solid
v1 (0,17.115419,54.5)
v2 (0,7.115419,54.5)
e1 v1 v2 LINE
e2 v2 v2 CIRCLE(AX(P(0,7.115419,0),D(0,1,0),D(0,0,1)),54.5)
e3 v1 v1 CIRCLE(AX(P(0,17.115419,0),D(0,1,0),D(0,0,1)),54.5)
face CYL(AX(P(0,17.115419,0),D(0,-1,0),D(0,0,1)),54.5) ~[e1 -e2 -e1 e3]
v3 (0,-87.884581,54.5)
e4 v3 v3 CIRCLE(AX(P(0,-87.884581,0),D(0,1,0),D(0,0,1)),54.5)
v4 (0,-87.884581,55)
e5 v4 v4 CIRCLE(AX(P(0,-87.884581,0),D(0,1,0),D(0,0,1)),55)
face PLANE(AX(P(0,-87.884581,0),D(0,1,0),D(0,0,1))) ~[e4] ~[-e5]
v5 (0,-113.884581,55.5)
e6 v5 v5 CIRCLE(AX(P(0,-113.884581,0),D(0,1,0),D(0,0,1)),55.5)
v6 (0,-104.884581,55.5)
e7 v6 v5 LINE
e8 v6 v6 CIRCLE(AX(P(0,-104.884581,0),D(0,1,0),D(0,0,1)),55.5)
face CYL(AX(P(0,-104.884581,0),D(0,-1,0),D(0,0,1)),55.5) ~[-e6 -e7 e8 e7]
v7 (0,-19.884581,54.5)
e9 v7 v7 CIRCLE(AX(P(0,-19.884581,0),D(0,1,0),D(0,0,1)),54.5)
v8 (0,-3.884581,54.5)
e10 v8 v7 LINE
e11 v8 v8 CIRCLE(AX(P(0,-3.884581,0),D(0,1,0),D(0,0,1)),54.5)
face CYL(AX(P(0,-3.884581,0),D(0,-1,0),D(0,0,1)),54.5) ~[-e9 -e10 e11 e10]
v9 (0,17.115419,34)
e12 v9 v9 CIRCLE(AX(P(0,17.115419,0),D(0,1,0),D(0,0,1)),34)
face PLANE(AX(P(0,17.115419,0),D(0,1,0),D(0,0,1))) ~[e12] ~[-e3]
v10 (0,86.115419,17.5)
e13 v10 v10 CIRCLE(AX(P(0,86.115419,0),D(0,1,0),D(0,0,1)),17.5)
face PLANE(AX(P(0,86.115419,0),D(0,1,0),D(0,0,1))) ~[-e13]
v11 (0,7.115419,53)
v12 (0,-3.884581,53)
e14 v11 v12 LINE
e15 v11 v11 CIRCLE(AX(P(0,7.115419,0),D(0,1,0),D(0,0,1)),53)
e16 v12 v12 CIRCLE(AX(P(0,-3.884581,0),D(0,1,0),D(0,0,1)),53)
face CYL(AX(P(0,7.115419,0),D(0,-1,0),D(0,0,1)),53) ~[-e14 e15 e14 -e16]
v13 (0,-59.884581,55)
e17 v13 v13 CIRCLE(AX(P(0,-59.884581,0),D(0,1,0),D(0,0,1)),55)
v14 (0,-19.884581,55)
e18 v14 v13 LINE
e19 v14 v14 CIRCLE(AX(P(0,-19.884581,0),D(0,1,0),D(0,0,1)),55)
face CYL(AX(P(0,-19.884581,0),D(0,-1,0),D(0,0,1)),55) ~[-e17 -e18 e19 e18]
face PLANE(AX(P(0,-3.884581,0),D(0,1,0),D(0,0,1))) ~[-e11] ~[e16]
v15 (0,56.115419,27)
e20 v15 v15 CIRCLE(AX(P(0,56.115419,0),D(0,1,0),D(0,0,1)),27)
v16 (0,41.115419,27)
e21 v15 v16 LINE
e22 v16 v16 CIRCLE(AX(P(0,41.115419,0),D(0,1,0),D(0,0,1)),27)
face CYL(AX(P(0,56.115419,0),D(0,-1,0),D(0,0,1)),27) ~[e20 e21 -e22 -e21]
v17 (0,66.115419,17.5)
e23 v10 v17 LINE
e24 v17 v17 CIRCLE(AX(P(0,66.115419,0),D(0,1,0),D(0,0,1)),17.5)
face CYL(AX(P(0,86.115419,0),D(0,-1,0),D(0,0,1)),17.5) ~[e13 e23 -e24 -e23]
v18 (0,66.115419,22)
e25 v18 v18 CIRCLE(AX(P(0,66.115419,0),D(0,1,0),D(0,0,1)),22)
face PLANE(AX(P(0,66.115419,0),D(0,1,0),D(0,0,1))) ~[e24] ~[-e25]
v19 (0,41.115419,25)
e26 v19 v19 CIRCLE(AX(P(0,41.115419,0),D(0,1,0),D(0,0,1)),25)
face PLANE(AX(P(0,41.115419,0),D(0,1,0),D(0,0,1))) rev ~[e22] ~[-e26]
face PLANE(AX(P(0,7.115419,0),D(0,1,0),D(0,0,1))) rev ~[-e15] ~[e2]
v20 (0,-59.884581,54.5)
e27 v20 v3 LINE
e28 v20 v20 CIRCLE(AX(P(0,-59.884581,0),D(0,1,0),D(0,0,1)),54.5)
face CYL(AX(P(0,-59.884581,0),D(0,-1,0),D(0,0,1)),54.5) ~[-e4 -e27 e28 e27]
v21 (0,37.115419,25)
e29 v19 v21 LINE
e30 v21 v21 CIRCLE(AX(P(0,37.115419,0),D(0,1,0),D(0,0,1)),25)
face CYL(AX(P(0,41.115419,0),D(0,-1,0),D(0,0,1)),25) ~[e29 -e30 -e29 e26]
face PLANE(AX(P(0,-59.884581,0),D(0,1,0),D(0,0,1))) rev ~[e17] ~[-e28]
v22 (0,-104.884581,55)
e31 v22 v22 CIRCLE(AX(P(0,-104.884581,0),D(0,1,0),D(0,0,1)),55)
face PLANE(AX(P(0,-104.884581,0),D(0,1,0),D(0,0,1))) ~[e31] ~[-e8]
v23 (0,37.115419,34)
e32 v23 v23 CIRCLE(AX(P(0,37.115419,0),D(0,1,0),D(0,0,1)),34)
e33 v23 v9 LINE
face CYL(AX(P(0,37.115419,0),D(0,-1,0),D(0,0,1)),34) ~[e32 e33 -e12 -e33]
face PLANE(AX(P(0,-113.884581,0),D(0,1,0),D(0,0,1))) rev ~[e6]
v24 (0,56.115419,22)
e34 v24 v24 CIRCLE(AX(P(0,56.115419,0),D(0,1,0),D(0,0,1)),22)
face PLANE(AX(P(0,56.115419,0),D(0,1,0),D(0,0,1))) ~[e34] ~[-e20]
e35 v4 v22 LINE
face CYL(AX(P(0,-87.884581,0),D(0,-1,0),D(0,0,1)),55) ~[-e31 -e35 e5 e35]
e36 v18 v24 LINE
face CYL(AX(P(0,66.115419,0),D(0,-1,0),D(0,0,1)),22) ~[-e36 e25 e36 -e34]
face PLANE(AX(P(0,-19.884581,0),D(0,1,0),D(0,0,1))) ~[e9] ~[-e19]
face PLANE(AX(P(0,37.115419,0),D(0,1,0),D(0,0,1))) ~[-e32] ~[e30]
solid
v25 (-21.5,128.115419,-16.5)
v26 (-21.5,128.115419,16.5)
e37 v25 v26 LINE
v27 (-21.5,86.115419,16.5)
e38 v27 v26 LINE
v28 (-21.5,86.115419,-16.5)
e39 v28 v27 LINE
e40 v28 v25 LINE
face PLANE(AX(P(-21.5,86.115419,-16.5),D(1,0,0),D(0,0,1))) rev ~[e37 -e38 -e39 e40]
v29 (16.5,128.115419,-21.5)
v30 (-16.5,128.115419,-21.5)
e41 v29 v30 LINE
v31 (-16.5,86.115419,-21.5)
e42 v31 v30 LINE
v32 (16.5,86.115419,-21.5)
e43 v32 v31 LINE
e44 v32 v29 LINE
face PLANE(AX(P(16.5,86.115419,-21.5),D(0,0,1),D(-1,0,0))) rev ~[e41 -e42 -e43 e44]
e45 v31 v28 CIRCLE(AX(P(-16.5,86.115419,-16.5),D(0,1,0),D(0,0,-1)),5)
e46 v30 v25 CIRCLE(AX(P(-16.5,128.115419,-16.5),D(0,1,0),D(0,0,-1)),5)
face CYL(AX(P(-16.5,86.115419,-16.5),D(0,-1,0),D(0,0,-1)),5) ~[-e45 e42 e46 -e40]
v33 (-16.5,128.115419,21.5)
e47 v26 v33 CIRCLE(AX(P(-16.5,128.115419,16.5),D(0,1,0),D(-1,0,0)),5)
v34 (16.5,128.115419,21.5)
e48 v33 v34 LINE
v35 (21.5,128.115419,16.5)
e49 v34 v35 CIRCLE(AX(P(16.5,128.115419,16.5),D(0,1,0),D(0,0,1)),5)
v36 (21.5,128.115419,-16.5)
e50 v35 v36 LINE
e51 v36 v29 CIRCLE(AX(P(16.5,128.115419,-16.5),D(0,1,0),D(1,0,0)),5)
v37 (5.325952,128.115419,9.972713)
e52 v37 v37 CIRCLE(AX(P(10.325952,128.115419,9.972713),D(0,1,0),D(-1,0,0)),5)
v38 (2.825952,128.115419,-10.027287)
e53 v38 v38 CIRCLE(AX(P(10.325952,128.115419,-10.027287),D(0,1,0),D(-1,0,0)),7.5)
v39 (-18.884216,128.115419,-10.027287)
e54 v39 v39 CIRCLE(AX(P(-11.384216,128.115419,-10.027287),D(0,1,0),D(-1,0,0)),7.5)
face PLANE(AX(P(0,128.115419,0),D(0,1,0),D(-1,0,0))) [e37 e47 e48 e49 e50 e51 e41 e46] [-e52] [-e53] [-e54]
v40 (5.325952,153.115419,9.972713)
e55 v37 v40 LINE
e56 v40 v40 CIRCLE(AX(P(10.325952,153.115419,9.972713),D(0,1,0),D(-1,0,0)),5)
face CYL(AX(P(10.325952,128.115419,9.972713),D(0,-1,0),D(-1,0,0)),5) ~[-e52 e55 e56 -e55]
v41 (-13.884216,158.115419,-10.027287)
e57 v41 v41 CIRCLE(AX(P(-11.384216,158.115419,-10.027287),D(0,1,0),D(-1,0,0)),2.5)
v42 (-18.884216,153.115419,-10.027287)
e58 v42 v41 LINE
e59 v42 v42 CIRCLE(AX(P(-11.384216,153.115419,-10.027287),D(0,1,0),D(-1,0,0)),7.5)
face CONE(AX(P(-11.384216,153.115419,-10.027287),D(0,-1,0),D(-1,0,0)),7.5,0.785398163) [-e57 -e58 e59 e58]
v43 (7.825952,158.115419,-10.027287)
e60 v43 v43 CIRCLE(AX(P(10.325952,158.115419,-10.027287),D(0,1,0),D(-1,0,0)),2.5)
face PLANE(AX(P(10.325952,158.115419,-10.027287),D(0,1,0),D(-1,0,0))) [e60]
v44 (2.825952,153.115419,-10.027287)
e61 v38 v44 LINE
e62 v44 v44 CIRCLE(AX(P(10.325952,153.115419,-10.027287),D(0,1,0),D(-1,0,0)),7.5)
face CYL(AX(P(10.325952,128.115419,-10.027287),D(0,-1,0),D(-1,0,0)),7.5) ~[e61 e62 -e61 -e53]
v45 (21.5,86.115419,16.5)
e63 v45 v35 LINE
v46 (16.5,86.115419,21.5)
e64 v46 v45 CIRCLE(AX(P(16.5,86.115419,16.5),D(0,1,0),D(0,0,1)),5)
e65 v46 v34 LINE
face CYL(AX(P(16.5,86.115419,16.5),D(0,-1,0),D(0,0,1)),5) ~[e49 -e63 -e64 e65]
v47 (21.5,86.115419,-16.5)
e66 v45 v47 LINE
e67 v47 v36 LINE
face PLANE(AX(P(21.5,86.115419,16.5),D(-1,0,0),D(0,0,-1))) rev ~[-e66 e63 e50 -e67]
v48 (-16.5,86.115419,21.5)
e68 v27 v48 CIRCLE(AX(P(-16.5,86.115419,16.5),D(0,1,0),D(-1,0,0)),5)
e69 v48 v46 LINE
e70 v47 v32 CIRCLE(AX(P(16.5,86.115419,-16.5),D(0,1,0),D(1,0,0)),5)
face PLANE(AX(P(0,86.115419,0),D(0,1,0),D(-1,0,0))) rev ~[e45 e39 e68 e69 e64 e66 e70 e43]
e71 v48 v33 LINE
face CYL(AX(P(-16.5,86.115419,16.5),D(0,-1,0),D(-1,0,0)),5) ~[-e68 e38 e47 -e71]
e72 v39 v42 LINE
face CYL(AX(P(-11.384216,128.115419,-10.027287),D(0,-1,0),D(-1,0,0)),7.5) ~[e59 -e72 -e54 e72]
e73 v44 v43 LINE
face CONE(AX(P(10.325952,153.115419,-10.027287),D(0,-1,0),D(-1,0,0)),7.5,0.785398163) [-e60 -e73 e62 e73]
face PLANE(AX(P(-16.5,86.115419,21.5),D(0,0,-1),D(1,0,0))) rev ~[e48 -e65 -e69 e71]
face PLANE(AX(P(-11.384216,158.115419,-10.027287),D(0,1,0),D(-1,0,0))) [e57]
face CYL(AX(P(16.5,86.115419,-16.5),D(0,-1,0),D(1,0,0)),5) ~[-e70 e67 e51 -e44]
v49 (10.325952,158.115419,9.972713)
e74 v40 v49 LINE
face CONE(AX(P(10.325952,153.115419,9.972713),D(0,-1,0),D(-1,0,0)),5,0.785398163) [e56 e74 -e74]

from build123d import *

# Parameters (mm, degrees)
F2_R     = 17.5
F3_DEPTH = 42
F4_R     = 5
F4_R_2   = 7.5
F5_DEPTH = 30
F6_SIZE  = 5


with BuildPart() as f1:
    # F0 (on Right) → F1 (revolve)
    with BuildSketch(Plane.YZ):
        Polygon((-113.8845806535, 55.5), (-113.8845806535, 0), (86.1154193465, 0), (86.1154193465, 17.5), (66.1154193465, 17.5), (66.1154193465, 22), (56.1154193465, 22), (56.1154193465, 27), (41.1154193465, 27), (41.1154193465, 25), (37.1154193465, 25), (37.1154193465, 34), (17.1154193465, 34), (17.1154193465, 54.5), (7.1154193465, 54.5), (7.1154193465, 53), (-3.8845806535, 53), (-3.8845806535, 54.5), (-19.8845806535, 54.5), (-19.8845806535, 55), (-59.8845806535, 55), (-59.8845806535, 54.5), (-87.8845806535, 54.5), (-87.8845806535, 55), (-104.8845806535, 55), (-104.8845806535, 55.5), align=None)
    revolve(axis=Axis((0, -10.2711766958, 0), (0, 1, 0)))


with BuildPart() as f3:
    # F2 (on face) → F3 (new body)
    with BuildSketch(Plane(origin=(0, 86.1154193465, 0), x_dir=(-1, 0, 0), z_dir=(0, 1, 0))):
        with BuildLine():
            Line((16.5, 21.5), (-16.5, 21.5))
            ThreePointArc((-16.5, 21.5), (-20.0355339059, 20.0355339059), (-21.5, 16.5))
            Line((-21.5, 16.5), (-21.5, -16.5))
            ThreePointArc((-21.5, -16.5), (-20.0355339059, -20.0355339059), (-16.5, -21.5))
            Line((-16.5, -21.5), (16.5, -21.5))
            ThreePointArc((16.5, -21.5), (20.0355339059, -20.0355339059), (21.5, -16.5))
            Line((21.5, -16.5), (21.5, 16.5))
            ThreePointArc((21.5, 16.5), (20.0355339059, 20.0355339059), (16.5, 21.5))
        make_face()
        Circle(F2_R, mode=Mode.SUBTRACT)
        Circle(F2_R)
    extrude(amount=F3_DEPTH)

    # F4 (on face) → F5 (join)
    with BuildSketch(Plane(origin=(0, 128.1154193465, 0), x_dir=(-1, 0, 0), z_dir=(0, 1, 0))):
        with Locations((-10.3259523134, 9.9727134464)):
            Circle(F4_R)
        with Locations((-10.3259523134, -10.0272865536)):
            Circle(F4_R_2)
        with Locations((11.3842158583, -10.0272865536)):
            Circle(F4_R_2)
    extrude(amount=F5_DEPTH)

    # F6
    f6_edges = [f3.edges().sort_by_distance(p)[0] for p in [
        (-3.884216, 158.115419, -10.027287),
        (17.825952, 158.115419, -10.027287),
        (15.325952, 158.115419, 9.972713),
    ]]
    chamfer(f6_edges, length=F6_SIZE)


solid = Compound([f1.part, f3.part])
